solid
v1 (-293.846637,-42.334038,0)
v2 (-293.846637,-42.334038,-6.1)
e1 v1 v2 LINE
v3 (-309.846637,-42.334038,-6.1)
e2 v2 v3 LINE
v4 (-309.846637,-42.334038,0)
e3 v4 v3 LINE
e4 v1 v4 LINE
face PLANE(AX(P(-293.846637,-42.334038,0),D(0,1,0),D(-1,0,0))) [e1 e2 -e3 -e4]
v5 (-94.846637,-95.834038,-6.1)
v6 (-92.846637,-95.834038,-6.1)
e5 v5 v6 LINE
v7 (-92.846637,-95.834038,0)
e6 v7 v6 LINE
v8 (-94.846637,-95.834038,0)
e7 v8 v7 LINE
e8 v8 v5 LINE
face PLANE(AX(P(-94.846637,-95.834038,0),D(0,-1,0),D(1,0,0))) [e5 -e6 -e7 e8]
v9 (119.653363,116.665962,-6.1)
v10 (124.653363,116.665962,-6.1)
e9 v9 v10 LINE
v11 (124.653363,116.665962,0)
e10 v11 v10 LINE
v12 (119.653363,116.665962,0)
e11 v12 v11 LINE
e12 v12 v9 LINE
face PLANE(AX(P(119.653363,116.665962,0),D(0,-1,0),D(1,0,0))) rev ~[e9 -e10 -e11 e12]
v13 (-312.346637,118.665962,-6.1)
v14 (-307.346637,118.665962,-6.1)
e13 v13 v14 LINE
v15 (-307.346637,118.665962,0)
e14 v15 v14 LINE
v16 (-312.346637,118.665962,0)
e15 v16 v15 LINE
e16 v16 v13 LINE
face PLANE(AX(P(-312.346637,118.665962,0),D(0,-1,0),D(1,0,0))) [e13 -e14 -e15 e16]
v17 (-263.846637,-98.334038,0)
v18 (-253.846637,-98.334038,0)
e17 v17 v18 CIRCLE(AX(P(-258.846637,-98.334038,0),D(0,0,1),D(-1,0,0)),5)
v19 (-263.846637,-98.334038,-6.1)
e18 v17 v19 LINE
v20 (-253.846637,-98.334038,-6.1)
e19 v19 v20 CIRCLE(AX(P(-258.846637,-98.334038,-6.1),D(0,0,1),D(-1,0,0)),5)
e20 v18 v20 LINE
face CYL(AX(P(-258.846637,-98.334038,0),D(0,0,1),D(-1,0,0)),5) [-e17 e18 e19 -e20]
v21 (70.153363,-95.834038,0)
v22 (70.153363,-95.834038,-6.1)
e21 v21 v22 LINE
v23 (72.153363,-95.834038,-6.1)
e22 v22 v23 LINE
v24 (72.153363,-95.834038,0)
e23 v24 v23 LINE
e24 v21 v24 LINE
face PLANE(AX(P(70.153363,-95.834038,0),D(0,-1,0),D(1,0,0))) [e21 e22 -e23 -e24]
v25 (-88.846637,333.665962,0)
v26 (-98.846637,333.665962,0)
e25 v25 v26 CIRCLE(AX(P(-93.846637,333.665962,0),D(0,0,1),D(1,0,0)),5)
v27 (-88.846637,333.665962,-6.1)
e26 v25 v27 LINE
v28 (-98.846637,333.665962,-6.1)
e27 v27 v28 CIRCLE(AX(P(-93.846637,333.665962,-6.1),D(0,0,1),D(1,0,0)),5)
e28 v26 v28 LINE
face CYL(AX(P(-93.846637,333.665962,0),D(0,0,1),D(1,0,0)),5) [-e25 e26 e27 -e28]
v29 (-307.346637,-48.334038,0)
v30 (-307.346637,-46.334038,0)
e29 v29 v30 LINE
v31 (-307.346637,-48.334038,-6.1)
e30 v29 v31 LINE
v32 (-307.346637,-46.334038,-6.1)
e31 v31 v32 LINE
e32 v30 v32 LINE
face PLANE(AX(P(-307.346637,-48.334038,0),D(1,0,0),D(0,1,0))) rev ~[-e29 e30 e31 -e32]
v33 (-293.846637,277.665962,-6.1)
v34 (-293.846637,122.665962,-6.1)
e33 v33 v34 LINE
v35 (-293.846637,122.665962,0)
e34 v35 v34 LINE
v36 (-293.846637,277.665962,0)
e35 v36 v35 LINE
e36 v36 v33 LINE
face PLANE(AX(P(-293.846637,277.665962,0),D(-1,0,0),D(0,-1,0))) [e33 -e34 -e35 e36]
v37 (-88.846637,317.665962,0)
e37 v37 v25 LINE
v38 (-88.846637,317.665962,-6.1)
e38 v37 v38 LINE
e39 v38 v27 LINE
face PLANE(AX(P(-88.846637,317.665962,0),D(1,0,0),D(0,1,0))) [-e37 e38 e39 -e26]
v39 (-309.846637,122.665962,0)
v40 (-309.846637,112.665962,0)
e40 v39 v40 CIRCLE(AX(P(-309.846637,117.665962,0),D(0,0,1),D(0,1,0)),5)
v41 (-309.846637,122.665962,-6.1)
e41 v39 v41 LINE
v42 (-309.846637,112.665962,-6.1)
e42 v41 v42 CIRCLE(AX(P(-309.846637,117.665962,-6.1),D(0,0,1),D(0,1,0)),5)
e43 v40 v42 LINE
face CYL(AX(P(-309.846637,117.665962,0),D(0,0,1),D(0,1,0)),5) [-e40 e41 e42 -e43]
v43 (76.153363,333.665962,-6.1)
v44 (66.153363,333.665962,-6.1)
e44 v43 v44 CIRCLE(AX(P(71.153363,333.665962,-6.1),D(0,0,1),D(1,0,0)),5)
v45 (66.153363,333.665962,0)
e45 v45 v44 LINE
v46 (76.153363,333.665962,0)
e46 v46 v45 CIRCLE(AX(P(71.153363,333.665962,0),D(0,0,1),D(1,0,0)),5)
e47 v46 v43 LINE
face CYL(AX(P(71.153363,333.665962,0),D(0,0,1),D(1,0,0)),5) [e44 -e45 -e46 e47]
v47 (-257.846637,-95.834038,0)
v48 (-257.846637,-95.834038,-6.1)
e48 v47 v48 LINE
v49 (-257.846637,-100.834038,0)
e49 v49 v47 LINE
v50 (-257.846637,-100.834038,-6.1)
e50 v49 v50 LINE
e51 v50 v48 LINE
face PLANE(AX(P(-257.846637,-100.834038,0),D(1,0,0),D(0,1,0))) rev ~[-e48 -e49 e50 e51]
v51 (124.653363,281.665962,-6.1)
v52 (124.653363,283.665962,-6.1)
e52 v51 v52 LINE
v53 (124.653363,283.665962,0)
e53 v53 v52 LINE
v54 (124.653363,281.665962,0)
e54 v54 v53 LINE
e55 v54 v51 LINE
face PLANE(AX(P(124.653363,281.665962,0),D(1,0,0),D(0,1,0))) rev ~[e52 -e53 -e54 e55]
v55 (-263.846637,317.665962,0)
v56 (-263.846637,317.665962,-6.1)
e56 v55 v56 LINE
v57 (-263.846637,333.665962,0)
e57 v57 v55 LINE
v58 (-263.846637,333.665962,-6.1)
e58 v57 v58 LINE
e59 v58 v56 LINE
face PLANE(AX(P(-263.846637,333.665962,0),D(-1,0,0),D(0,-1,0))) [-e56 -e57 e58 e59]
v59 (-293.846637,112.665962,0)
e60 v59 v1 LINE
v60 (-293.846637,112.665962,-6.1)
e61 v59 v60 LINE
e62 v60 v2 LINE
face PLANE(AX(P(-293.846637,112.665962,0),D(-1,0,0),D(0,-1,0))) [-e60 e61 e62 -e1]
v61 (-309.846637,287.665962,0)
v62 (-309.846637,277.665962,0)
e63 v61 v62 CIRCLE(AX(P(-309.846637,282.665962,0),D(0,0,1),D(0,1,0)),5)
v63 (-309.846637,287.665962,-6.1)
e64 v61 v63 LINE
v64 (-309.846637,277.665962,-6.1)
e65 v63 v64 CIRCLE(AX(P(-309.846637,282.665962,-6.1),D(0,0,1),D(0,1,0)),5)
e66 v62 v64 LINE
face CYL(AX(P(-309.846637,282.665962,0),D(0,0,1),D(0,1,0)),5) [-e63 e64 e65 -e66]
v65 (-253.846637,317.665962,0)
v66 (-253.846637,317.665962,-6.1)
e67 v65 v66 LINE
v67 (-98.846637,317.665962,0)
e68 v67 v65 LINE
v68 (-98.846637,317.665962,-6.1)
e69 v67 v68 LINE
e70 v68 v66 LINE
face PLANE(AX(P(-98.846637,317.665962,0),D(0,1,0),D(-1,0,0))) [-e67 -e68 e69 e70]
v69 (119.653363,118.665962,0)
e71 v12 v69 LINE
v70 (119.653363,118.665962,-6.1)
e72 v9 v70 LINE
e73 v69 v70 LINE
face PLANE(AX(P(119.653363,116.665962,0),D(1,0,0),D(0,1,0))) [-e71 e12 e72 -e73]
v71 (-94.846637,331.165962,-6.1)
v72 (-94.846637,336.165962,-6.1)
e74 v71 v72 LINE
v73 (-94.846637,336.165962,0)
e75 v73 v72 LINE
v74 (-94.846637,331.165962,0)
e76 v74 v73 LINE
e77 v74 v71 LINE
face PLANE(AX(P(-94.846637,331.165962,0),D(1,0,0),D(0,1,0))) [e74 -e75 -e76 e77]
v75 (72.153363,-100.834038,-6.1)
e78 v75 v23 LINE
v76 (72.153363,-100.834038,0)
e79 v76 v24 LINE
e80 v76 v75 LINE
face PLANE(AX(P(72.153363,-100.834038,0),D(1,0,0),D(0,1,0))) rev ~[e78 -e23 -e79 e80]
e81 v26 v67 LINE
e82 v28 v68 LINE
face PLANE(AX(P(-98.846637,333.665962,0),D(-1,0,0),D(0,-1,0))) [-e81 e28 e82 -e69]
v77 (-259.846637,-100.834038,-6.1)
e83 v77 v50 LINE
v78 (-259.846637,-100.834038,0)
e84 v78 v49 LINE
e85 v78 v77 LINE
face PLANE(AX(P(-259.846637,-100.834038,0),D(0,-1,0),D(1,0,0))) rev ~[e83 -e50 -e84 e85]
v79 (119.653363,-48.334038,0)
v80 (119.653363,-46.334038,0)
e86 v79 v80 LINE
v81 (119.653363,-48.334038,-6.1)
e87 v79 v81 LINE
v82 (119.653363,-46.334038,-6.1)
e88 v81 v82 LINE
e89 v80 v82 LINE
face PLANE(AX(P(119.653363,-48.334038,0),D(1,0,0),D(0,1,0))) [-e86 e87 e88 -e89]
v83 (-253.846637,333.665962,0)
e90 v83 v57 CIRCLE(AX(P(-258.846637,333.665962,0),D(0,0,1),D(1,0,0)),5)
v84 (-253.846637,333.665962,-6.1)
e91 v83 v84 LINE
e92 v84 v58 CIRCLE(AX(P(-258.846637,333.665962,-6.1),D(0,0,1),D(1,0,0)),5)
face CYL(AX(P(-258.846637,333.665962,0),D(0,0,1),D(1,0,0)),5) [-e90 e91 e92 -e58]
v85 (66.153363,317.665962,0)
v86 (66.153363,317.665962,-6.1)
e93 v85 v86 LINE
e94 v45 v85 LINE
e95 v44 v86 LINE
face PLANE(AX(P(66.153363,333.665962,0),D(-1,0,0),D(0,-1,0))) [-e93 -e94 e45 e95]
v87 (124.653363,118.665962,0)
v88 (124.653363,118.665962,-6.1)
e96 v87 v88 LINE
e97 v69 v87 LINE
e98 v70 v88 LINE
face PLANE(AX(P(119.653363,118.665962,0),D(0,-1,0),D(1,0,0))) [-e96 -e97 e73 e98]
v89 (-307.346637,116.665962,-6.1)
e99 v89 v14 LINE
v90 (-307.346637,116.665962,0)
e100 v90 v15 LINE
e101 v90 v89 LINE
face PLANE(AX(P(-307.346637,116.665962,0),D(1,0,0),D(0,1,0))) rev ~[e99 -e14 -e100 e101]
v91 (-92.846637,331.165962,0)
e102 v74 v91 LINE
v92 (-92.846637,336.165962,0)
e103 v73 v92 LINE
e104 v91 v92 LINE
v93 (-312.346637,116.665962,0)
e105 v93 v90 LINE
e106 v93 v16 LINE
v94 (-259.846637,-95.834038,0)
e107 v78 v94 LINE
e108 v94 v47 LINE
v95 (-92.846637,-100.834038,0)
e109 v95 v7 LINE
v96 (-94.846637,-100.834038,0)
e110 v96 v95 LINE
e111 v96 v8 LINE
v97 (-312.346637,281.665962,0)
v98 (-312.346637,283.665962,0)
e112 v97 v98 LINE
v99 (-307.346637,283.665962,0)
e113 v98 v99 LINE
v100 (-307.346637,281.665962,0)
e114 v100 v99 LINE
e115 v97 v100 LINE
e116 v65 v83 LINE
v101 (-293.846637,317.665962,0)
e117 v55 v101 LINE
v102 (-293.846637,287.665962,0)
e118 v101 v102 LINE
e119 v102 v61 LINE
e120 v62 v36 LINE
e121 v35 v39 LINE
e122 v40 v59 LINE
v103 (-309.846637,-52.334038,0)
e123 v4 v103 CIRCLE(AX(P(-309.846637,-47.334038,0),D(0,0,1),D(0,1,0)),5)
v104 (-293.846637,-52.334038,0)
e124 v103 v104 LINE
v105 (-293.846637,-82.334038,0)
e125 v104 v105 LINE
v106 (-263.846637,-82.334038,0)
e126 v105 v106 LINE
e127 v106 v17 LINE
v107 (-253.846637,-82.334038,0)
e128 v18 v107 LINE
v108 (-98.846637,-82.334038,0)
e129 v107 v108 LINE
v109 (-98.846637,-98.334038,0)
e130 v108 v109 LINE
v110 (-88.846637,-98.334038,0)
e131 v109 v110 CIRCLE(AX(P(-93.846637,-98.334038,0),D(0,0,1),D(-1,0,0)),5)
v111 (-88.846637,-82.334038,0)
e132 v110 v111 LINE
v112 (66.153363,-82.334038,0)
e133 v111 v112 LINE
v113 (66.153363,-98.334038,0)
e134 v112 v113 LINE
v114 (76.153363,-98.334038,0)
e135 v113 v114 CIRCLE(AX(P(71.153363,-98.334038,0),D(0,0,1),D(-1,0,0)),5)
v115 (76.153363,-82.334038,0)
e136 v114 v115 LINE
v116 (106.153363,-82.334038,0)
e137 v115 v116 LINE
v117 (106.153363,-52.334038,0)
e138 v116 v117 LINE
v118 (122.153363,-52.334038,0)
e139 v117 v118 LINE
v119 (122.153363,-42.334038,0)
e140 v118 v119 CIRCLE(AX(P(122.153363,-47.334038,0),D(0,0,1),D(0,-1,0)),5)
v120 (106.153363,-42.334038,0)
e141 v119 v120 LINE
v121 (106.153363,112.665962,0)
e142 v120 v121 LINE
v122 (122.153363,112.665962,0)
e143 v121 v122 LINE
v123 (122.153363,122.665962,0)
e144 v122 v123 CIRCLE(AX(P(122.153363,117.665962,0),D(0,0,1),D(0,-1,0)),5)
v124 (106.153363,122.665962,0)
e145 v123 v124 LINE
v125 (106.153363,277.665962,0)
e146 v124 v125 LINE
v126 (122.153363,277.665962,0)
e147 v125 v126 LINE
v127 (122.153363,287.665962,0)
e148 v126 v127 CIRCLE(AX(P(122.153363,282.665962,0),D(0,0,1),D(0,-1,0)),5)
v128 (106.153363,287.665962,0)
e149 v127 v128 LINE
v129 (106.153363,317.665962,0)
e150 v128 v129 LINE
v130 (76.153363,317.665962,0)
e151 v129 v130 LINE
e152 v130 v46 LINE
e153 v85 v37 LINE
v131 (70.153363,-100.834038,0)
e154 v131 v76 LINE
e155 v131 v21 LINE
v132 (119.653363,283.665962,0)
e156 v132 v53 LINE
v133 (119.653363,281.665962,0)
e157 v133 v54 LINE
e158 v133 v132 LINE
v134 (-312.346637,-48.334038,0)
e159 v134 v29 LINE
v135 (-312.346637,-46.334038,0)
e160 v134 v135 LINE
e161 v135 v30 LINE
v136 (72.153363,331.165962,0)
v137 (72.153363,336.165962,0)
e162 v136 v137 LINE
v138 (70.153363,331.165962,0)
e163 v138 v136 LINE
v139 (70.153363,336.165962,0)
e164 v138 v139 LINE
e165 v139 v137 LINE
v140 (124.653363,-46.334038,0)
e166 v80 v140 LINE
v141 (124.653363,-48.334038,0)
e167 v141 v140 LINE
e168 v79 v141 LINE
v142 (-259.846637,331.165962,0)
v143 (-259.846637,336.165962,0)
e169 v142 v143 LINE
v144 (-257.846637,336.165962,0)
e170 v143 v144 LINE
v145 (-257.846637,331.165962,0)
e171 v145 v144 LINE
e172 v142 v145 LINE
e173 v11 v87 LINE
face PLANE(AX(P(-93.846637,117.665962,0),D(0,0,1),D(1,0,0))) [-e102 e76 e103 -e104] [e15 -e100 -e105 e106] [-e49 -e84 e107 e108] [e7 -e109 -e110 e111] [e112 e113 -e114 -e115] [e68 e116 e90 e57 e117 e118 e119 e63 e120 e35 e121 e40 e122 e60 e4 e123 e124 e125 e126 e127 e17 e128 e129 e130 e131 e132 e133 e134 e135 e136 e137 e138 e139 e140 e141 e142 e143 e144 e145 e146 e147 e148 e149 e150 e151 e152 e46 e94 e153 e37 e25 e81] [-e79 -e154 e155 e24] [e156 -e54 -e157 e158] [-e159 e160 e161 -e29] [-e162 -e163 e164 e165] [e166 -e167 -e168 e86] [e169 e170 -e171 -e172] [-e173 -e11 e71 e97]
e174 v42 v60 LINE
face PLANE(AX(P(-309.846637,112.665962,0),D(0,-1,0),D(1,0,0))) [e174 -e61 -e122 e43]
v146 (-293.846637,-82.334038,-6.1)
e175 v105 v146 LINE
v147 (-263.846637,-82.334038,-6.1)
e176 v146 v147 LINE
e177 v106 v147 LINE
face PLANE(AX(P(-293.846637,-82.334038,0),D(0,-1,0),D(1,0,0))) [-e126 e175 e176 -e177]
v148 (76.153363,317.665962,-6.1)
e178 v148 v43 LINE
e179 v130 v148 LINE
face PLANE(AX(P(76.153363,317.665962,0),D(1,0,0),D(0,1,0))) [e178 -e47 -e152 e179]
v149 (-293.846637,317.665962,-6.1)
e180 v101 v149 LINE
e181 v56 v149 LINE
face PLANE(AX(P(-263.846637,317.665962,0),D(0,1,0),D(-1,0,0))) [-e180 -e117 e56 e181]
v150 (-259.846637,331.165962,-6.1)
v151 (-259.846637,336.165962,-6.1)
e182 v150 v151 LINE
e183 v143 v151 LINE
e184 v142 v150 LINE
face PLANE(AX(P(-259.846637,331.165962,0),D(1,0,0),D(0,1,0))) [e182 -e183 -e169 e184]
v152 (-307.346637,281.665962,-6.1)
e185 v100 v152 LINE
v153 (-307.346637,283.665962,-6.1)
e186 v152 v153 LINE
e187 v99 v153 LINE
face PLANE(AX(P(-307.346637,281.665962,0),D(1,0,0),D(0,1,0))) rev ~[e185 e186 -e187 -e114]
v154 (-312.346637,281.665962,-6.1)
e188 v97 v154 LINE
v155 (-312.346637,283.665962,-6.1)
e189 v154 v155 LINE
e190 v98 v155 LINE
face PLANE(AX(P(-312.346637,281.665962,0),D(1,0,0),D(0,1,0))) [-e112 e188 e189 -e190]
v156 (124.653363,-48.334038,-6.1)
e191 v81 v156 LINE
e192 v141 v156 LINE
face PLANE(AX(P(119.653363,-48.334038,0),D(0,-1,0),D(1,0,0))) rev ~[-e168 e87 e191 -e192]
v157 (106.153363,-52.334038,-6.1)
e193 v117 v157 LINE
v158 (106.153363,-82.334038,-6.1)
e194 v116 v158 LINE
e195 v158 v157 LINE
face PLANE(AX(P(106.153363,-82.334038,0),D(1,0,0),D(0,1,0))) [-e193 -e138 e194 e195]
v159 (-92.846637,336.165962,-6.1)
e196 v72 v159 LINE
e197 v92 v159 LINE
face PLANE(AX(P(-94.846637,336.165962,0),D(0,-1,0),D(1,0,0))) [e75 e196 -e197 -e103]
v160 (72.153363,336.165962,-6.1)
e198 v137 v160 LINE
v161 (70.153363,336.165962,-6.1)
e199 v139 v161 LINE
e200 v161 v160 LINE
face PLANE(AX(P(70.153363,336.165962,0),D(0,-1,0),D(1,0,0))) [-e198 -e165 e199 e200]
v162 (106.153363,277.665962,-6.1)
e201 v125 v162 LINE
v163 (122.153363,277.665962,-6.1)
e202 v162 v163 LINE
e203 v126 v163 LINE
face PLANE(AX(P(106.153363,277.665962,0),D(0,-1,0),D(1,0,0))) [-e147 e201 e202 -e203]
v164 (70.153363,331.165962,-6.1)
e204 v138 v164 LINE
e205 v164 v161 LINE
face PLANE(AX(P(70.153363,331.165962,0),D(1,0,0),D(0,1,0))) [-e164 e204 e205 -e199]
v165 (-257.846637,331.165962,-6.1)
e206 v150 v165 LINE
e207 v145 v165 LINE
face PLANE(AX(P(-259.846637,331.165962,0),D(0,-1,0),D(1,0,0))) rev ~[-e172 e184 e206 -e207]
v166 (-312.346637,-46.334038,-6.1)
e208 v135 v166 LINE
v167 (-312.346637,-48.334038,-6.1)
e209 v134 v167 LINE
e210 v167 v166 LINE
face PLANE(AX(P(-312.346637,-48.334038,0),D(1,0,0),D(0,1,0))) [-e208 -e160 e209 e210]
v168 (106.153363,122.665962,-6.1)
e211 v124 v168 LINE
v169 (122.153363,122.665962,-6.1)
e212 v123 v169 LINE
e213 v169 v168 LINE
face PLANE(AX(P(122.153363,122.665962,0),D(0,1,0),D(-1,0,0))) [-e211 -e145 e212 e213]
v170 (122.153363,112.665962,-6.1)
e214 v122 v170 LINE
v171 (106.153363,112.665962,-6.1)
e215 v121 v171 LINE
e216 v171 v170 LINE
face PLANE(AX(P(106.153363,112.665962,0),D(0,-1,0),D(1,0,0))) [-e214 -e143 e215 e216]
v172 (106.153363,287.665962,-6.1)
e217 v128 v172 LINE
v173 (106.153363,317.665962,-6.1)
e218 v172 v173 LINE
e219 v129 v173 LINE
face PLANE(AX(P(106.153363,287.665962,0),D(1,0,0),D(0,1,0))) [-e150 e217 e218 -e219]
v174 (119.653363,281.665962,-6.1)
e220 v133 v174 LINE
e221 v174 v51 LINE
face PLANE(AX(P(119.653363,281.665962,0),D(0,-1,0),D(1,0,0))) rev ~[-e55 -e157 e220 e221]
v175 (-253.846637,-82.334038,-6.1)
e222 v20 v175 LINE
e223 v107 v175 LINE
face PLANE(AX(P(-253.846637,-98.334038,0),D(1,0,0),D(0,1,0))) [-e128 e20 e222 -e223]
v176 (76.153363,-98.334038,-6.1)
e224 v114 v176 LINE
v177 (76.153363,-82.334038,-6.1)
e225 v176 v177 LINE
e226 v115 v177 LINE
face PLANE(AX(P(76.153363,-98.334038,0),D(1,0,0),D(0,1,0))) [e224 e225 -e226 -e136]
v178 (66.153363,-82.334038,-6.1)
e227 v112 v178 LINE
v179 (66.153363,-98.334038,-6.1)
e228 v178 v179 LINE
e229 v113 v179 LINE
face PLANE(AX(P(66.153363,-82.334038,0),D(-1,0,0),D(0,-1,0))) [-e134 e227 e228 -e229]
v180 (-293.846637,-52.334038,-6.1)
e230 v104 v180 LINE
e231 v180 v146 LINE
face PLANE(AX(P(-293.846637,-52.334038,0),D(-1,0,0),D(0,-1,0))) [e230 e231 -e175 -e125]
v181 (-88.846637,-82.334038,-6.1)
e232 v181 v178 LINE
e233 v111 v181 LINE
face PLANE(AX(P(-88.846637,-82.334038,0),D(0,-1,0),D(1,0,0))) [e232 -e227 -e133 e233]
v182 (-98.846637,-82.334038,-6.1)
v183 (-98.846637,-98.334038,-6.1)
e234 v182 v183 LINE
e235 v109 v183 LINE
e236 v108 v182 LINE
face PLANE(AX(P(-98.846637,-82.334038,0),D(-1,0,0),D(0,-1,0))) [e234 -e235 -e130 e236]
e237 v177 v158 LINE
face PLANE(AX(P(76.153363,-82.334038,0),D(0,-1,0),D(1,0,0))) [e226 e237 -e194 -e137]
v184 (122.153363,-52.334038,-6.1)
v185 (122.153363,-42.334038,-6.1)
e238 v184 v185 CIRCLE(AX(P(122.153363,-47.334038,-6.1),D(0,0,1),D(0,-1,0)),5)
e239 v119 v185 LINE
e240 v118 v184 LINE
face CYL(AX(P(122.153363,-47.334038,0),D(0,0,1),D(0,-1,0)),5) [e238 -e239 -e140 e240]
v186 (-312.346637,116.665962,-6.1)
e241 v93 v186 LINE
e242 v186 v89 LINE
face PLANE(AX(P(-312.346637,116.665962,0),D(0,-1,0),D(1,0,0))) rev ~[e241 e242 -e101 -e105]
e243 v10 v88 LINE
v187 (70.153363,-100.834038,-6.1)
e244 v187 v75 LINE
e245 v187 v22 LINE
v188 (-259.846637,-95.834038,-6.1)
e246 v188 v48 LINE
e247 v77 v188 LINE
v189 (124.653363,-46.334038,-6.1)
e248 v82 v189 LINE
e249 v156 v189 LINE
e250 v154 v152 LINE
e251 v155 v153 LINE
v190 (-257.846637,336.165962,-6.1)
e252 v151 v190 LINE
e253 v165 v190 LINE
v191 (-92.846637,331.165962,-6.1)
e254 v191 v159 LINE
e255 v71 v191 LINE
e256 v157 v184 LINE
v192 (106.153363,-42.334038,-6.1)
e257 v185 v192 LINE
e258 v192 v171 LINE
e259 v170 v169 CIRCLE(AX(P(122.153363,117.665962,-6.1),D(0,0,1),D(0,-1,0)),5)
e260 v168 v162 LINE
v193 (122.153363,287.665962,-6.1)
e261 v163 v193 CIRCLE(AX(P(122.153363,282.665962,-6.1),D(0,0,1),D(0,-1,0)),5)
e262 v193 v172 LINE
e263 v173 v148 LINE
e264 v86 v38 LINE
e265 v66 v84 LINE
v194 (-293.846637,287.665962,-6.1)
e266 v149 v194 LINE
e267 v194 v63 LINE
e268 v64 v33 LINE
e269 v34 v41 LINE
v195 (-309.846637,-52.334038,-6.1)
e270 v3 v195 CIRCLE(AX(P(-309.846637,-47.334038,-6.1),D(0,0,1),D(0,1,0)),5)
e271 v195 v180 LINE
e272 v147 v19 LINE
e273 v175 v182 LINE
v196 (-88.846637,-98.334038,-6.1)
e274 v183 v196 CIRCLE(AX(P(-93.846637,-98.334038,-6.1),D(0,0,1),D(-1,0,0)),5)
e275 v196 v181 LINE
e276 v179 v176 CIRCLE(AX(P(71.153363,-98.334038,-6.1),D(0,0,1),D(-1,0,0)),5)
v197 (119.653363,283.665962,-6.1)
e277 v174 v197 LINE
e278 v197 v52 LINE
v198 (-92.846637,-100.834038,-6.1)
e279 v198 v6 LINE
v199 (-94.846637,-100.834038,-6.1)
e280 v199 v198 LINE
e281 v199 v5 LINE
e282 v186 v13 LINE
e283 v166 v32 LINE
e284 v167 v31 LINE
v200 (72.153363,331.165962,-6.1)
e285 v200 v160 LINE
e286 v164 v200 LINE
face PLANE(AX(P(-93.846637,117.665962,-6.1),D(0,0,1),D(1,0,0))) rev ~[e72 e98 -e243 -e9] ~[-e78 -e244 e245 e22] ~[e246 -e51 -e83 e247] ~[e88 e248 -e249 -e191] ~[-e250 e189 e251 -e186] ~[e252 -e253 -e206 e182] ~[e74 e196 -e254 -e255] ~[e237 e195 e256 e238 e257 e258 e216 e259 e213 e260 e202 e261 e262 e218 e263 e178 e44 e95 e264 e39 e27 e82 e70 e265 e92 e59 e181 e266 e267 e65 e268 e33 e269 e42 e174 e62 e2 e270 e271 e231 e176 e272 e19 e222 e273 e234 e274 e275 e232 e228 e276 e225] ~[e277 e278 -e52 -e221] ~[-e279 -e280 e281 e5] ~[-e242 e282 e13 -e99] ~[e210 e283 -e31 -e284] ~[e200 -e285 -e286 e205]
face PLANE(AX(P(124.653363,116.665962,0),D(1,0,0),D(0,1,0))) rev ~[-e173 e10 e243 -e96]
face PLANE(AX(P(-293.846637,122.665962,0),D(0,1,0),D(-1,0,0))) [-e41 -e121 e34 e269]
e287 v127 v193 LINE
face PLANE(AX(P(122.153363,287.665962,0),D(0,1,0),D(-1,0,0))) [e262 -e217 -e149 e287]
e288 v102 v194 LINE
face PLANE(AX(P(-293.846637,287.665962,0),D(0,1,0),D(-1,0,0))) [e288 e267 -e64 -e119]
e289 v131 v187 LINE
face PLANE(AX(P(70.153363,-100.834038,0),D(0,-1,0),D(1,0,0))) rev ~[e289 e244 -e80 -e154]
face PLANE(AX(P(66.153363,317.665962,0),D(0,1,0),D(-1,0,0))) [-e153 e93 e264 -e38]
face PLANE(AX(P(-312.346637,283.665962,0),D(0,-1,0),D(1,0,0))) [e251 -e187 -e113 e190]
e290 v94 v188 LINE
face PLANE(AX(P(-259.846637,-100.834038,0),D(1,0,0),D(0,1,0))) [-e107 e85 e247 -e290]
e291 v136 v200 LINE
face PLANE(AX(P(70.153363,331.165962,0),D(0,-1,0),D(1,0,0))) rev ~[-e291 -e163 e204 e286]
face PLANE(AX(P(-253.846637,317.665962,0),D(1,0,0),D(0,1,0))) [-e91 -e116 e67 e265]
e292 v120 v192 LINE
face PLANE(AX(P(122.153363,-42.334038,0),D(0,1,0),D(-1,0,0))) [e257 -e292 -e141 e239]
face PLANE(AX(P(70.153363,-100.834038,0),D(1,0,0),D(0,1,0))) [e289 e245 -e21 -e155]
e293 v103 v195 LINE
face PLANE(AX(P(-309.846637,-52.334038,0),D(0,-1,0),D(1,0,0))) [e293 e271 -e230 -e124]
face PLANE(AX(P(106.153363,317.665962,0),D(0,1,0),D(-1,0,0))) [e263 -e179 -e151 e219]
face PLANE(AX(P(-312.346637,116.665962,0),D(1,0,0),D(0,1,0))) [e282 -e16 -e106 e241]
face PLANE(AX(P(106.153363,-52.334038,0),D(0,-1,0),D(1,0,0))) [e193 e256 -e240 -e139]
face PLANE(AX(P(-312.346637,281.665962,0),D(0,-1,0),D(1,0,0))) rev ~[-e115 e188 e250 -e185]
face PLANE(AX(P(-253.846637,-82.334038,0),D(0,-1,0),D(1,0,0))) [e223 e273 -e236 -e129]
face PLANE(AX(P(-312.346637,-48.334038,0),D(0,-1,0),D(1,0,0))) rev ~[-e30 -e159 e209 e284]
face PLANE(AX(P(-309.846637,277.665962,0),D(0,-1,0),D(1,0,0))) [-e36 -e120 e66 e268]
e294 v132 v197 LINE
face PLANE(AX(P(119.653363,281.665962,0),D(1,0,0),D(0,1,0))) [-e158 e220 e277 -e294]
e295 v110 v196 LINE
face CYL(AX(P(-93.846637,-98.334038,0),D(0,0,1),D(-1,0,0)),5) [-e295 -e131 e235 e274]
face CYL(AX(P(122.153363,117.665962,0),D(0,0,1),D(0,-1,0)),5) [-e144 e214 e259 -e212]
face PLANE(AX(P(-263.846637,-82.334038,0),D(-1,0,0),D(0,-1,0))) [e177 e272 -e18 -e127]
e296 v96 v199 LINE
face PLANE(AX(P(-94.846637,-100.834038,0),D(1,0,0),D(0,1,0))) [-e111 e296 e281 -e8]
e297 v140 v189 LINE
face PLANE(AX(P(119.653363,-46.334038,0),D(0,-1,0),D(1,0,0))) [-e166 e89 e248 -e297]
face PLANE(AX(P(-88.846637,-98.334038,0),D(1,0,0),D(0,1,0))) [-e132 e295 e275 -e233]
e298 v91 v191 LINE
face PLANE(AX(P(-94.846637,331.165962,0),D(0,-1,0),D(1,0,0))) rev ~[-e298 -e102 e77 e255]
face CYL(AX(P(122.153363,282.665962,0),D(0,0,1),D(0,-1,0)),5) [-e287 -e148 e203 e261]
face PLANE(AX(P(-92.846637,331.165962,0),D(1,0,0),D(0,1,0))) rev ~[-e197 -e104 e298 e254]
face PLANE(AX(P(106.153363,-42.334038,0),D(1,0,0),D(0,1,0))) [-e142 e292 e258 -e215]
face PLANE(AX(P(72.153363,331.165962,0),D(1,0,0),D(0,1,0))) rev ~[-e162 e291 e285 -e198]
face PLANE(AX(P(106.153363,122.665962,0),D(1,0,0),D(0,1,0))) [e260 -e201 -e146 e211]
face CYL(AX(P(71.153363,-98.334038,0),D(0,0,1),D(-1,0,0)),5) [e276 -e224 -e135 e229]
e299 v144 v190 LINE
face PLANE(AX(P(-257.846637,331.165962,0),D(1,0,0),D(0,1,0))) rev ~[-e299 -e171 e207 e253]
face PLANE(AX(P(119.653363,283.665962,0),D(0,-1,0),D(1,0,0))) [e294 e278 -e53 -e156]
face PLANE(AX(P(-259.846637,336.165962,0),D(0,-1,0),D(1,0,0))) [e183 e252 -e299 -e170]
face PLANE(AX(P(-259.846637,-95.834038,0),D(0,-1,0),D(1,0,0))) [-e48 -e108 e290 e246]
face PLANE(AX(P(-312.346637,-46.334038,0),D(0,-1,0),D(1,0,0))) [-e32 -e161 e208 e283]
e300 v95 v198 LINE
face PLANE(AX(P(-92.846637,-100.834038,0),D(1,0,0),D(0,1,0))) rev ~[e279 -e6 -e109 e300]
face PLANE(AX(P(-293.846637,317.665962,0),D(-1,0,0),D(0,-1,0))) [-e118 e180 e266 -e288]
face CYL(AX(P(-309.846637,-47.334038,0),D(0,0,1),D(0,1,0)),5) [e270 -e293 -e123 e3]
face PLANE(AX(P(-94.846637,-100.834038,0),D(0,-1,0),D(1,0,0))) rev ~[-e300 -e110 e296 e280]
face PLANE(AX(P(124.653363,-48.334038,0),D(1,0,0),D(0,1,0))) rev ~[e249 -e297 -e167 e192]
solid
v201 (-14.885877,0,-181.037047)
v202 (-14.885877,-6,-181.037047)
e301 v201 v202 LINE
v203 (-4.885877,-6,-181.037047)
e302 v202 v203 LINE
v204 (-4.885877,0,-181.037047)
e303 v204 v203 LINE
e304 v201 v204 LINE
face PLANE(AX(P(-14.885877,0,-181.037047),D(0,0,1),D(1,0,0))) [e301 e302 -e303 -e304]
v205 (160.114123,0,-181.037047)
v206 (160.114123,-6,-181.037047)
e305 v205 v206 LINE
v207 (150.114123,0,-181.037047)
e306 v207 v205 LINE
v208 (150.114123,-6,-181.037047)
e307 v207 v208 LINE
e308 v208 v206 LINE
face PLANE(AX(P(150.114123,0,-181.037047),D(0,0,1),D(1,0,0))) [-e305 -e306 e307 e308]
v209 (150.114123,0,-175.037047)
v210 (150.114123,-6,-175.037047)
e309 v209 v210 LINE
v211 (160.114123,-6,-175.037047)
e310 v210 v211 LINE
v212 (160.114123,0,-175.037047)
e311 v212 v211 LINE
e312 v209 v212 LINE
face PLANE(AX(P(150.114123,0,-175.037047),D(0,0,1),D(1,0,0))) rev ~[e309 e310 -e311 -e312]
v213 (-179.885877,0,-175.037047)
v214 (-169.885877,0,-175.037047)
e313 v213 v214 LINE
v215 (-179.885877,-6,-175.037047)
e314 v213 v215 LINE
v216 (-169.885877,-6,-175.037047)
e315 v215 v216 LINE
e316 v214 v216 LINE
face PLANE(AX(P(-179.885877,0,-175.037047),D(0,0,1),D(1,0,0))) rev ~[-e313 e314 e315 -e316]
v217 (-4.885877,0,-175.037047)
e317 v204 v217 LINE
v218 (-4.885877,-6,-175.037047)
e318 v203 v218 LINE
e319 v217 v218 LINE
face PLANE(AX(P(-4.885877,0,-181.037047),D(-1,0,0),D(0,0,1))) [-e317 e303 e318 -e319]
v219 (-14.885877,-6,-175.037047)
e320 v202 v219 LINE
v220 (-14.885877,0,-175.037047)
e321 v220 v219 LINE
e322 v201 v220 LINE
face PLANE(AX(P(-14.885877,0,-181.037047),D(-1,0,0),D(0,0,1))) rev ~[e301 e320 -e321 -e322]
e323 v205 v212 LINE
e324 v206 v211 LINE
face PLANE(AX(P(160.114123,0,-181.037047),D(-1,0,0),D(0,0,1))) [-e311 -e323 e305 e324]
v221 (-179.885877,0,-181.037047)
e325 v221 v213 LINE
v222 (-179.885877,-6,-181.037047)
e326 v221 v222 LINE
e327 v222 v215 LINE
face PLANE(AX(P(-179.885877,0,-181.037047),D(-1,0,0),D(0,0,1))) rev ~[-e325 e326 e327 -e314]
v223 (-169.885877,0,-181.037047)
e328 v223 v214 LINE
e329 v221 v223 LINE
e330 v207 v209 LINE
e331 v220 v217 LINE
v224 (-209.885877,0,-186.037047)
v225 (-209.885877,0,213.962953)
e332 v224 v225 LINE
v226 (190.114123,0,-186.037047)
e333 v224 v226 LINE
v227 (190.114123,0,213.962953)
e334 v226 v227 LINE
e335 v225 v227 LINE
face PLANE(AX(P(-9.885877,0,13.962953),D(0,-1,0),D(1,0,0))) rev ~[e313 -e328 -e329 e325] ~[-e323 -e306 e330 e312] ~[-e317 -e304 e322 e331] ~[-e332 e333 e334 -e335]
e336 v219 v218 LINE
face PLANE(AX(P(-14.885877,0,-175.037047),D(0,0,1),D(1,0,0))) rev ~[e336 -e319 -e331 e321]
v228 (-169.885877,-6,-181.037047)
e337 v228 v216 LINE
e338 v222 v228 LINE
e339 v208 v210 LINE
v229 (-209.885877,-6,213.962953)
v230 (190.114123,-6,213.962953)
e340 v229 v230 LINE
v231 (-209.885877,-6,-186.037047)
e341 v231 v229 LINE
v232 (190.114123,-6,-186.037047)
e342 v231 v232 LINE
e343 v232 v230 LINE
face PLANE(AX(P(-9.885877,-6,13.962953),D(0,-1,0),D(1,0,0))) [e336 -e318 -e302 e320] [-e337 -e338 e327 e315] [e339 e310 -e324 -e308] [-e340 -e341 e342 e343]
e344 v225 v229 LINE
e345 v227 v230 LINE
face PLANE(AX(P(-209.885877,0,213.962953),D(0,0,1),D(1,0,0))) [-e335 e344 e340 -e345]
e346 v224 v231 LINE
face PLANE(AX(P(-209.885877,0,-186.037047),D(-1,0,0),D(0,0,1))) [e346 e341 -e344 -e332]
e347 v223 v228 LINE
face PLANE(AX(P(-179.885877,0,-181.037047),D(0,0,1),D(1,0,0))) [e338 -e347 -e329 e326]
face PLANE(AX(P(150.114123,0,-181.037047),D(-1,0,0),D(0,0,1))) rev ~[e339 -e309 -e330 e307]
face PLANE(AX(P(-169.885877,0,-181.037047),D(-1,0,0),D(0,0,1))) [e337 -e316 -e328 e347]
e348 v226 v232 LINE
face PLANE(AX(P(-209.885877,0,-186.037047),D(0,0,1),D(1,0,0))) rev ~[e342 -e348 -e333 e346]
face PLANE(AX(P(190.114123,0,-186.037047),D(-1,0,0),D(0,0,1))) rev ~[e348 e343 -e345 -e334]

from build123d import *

# Parameters (mm, degrees)
F0_W     = 5
F0_H     = 2
F0_W_2   = 2
F0_H_2   = 5
F1_DEPTH = 6.1
F2_W     = 400
F2_H     = 400
F2_W_2   = 10
F2_H_2   = 6
F3_DEPTH = 6


# Not quite as in the source:
# - a feature names something its author has since deleted; it is built from what else it names


with BuildPart() as f1:
    # F0 (on Top) → F1 (new body)
    with BuildSketch(Plane.XY):
        Polygon((-263.8466370106, 317.6659622788), (-293.8466370106, 317.6659622788), (-293.8466370106, 287.6659622788), (-293.8466370106, 277.6659622788), (-293.8466370106, 122.6659622788), (-293.8466370106, 112.6659622788), (-293.8466370106, -42.3340377212), (-293.8466370106, -52.3340377212), (-293.8466370106, -82.3340377212), (-263.8466370106, -82.3340377212), (-253.8466370106, -82.3340377212), (-98.8466370106, -82.3340377212), (-88.8466370106, -82.3340377212), (66.1533629894, -82.3340377212), (76.1533629894, -82.3340377212), (106.1533629894, -82.3340377212), (106.1533629894, -52.3340377212), (106.1533629894, -42.3340377212), (106.1533629894, 112.6659622788), (106.1533629894, 122.6659622788), (106.1533629894, 277.6659622788), (106.1533629894, 287.6659622788), (106.1533629894, 317.6659622788), (76.1533629894, 317.6659622788), (66.1533629894, 317.6659622788), (-88.8466370106, 317.6659622788), (-98.8466370106, 317.6659622788), (-253.8466370106, 317.6659622788), align=None)
        with BuildLine():
            Line((-293.8466370106, -52.3340377212), (-293.8466370106, -42.3340377212))
            Line((-293.8466370106, -42.3340377212), (-309.8466370106, -42.3340377212))
            ThreePointArc((-309.8466370106, -42.3340377212), (-314.8466370106, -47.3340377212), (-309.8466370106, -52.3340377212))
            Line((-309.8466370106, -52.3340377212), (-293.8466370106, -52.3340377212))
        make_face()
        with Locations((-309.8466370106, -47.3340377212)):
            Rectangle(F0_W, F0_H, mode=Mode.SUBTRACT)
        with BuildLine():
            Line((-293.8466370106, 112.6659622788), (-293.8466370106, 122.6659622788))
            Line((-293.8466370106, 122.6659622788), (-309.8466370106, 122.6659622788))
            ThreePointArc((-309.8466370106, 122.6659622788), (-314.8466370106, 117.6659622788), (-309.8466370106, 112.6659622788))
            Line((-309.8466370106, 112.6659622788), (-293.8466370106, 112.6659622788))
        make_face()
        with Locations((-309.8466370106, 117.6659622788)):
            Rectangle(F0_W, F0_H, mode=Mode.SUBTRACT)
        with BuildLine():
            Line((-293.8466370106, 277.6659622788), (-293.8466370106, 287.6659622788))
            Line((-293.8466370106, 287.6659622788), (-309.8466370106, 287.6659622788))
            ThreePointArc((-309.8466370106, 287.6659622788), (-314.8466370106, 282.6659622788), (-309.8466370106, 277.6659622788))
            Line((-309.8466370106, 277.6659622788), (-293.8466370106, 277.6659622788))
        make_face()
        with Locations((-309.8466370106, 282.6659622788)):
            Rectangle(F0_W, F0_H, mode=Mode.SUBTRACT)
        with BuildLine():
            Line((122.1533629894, -42.3340377212), (106.1533629894, -42.3340377212))
            Line((106.1533629894, -42.3340377212), (106.1533629894, -52.3340377212))
            Line((106.1533629894, -52.3340377212), (122.1533629894, -52.3340377212))
            ThreePointArc((122.1533629894, -52.3340377212), (127.1533629894, -47.3340377212), (122.1533629894, -42.3340377212))
        make_face()
        with Locations((122.1533629894, -47.3340377212)):
            Rectangle(F0_W, F0_H, mode=Mode.SUBTRACT)
        with BuildLine():
            Line((122.1533629894, 122.6659622788), (106.1533629894, 122.6659622788))
            Line((106.1533629894, 122.6659622788), (106.1533629894, 112.6659622788))
            Line((106.1533629894, 112.6659622788), (122.1533629894, 112.6659622788))
            ThreePointArc((122.1533629894, 112.6659622788), (127.1533629894, 117.6659622788), (122.1533629894, 122.6659622788))
        make_face()
        with Locations((122.1533629894, 117.6659622788)):
            Rectangle(F0_W, F0_H, mode=Mode.SUBTRACT)
        with BuildLine():
            Line((122.1533629894, 287.6659622788), (106.1533629894, 287.6659622788))
            Line((106.1533629894, 287.6659622788), (106.1533629894, 277.6659622788))
            Line((106.1533629894, 277.6659622788), (122.1533629894, 277.6659622788))
            ThreePointArc((122.1533629894, 277.6659622788), (127.1533629894, 282.6659622788), (122.1533629894, 287.6659622788))
        make_face()
        with Locations((122.1533629894, 282.6659622788)):
            Rectangle(F0_W, F0_H, mode=Mode.SUBTRACT)
        with BuildLine():
            Line((-253.8466370106, -82.3340377212), (-263.8466370106, -82.3340377212))
            Line((-263.8466370106, -82.3340377212), (-263.8466370106, -98.3340377212))
            ThreePointArc((-263.8466370106, -98.3340377212), (-258.8466370106, -103.3340377212), (-253.8466370106, -98.3340377212))
            Line((-253.8466370106, -98.3340377212), (-253.8466370106, -82.3340377212))
        make_face()
        with Locations((-258.8466370106, -98.3340377212)):
            Rectangle(F0_W_2, F0_H_2, mode=Mode.SUBTRACT)
        with BuildLine():
            Line((-88.8466370106, -82.3340377212), (-98.8466370106, -82.3340377212))
            Line((-98.8466370106, -82.3340377212), (-98.8466370106, -98.3340377212))
            ThreePointArc((-98.8466370106, -98.3340377212), (-93.8466370106, -103.3340377212), (-88.8466370106, -98.3340377212))
            Line((-88.8466370106, -98.3340377212), (-88.8466370106, -82.3340377212))
        make_face()
        with Locations((-93.8466370106, -98.3340377212)):
            Rectangle(F0_W_2, F0_H_2, mode=Mode.SUBTRACT)
        with BuildLine():
            Line((76.1533629894, -82.3340377212), (66.1533629894, -82.3340377212))
            Line((66.1533629894, -82.3340377212), (66.1533629894, -98.3340377212))
            ThreePointArc((66.1533629894, -98.3340377212), (71.1533629894, -103.3340377212), (76.1533629894, -98.3340377212))
            Line((76.1533629894, -98.3340377212), (76.1533629894, -82.3340377212))
        make_face()
        with Locations((71.1533629894, -98.3340377212)):
            Rectangle(F0_W_2, F0_H_2, mode=Mode.SUBTRACT)
        with BuildLine():
            Line((66.1533629894, 333.6659622788), (66.1533629894, 317.6659622788))
            Line((66.1533629894, 317.6659622788), (76.1533629894, 317.6659622788))
            Line((76.1533629894, 317.6659622788), (76.1533629894, 333.6659622788))
            ThreePointArc((76.1533629894, 333.6659622788), (71.1533629894, 338.6659622788), (66.1533629894, 333.6659622788))
        make_face()
        with Locations((71.1533629894, 333.6659622788)):
            Rectangle(F0_W_2, F0_H_2, mode=Mode.SUBTRACT)
        with BuildLine():
            Line((-98.8466370106, 333.6659622788), (-98.8466370106, 317.6659622788))
            Line((-98.8466370106, 317.6659622788), (-88.8466370106, 317.6659622788))
            Line((-88.8466370106, 317.6659622788), (-88.8466370106, 333.6659622788))
            ThreePointArc((-88.8466370106, 333.6659622788), (-93.8466370106, 338.6659622788), (-98.8466370106, 333.6659622788))
        make_face()
        with Locations((-93.8466370106, 333.6659622788)):
            Rectangle(F0_W_2, F0_H_2, mode=Mode.SUBTRACT)
        with BuildLine():
            Line((-263.8466370106, 333.6659622788), (-263.8466370106, 317.6659622788))
            Line((-263.8466370106, 317.6659622788), (-253.8466370106, 317.6659622788))
            Line((-253.8466370106, 317.6659622788), (-253.8466370106, 333.6659622788))
            ThreePointArc((-253.8466370106, 333.6659622788), (-258.8466370106, 338.6659622788), (-263.8466370106, 333.6659622788))
        make_face()
        with Locations((-258.8466370106, 333.6659622788)):
            Rectangle(F0_W_2, F0_H_2, mode=Mode.SUBTRACT)
    extrude(amount=-F1_DEPTH)


with BuildPart() as f3:
    # F2 (on Front) → F3 (new body)
    with BuildSketch(Plane.XZ):
        with Locations((-9.8858773708, 13.9629530753)):
            Rectangle(F2_W, F2_H)
        with Locations((-174.8858773708, -178.0370469247)):
            Rectangle(F2_W_2, F2_H_2, mode=Mode.SUBTRACT)
        with Locations((-9.8858773708, -178.0370469247)):
            Rectangle(F2_W_2, F2_H_2, mode=Mode.SUBTRACT)
        with Locations((155.1141226292, -178.0370469247)):
            Rectangle(F2_W_2, F2_H_2, mode=Mode.SUBTRACT)
    extrude(amount=F3_DEPTH)


solid = Compound([f1.part, f3.part])
